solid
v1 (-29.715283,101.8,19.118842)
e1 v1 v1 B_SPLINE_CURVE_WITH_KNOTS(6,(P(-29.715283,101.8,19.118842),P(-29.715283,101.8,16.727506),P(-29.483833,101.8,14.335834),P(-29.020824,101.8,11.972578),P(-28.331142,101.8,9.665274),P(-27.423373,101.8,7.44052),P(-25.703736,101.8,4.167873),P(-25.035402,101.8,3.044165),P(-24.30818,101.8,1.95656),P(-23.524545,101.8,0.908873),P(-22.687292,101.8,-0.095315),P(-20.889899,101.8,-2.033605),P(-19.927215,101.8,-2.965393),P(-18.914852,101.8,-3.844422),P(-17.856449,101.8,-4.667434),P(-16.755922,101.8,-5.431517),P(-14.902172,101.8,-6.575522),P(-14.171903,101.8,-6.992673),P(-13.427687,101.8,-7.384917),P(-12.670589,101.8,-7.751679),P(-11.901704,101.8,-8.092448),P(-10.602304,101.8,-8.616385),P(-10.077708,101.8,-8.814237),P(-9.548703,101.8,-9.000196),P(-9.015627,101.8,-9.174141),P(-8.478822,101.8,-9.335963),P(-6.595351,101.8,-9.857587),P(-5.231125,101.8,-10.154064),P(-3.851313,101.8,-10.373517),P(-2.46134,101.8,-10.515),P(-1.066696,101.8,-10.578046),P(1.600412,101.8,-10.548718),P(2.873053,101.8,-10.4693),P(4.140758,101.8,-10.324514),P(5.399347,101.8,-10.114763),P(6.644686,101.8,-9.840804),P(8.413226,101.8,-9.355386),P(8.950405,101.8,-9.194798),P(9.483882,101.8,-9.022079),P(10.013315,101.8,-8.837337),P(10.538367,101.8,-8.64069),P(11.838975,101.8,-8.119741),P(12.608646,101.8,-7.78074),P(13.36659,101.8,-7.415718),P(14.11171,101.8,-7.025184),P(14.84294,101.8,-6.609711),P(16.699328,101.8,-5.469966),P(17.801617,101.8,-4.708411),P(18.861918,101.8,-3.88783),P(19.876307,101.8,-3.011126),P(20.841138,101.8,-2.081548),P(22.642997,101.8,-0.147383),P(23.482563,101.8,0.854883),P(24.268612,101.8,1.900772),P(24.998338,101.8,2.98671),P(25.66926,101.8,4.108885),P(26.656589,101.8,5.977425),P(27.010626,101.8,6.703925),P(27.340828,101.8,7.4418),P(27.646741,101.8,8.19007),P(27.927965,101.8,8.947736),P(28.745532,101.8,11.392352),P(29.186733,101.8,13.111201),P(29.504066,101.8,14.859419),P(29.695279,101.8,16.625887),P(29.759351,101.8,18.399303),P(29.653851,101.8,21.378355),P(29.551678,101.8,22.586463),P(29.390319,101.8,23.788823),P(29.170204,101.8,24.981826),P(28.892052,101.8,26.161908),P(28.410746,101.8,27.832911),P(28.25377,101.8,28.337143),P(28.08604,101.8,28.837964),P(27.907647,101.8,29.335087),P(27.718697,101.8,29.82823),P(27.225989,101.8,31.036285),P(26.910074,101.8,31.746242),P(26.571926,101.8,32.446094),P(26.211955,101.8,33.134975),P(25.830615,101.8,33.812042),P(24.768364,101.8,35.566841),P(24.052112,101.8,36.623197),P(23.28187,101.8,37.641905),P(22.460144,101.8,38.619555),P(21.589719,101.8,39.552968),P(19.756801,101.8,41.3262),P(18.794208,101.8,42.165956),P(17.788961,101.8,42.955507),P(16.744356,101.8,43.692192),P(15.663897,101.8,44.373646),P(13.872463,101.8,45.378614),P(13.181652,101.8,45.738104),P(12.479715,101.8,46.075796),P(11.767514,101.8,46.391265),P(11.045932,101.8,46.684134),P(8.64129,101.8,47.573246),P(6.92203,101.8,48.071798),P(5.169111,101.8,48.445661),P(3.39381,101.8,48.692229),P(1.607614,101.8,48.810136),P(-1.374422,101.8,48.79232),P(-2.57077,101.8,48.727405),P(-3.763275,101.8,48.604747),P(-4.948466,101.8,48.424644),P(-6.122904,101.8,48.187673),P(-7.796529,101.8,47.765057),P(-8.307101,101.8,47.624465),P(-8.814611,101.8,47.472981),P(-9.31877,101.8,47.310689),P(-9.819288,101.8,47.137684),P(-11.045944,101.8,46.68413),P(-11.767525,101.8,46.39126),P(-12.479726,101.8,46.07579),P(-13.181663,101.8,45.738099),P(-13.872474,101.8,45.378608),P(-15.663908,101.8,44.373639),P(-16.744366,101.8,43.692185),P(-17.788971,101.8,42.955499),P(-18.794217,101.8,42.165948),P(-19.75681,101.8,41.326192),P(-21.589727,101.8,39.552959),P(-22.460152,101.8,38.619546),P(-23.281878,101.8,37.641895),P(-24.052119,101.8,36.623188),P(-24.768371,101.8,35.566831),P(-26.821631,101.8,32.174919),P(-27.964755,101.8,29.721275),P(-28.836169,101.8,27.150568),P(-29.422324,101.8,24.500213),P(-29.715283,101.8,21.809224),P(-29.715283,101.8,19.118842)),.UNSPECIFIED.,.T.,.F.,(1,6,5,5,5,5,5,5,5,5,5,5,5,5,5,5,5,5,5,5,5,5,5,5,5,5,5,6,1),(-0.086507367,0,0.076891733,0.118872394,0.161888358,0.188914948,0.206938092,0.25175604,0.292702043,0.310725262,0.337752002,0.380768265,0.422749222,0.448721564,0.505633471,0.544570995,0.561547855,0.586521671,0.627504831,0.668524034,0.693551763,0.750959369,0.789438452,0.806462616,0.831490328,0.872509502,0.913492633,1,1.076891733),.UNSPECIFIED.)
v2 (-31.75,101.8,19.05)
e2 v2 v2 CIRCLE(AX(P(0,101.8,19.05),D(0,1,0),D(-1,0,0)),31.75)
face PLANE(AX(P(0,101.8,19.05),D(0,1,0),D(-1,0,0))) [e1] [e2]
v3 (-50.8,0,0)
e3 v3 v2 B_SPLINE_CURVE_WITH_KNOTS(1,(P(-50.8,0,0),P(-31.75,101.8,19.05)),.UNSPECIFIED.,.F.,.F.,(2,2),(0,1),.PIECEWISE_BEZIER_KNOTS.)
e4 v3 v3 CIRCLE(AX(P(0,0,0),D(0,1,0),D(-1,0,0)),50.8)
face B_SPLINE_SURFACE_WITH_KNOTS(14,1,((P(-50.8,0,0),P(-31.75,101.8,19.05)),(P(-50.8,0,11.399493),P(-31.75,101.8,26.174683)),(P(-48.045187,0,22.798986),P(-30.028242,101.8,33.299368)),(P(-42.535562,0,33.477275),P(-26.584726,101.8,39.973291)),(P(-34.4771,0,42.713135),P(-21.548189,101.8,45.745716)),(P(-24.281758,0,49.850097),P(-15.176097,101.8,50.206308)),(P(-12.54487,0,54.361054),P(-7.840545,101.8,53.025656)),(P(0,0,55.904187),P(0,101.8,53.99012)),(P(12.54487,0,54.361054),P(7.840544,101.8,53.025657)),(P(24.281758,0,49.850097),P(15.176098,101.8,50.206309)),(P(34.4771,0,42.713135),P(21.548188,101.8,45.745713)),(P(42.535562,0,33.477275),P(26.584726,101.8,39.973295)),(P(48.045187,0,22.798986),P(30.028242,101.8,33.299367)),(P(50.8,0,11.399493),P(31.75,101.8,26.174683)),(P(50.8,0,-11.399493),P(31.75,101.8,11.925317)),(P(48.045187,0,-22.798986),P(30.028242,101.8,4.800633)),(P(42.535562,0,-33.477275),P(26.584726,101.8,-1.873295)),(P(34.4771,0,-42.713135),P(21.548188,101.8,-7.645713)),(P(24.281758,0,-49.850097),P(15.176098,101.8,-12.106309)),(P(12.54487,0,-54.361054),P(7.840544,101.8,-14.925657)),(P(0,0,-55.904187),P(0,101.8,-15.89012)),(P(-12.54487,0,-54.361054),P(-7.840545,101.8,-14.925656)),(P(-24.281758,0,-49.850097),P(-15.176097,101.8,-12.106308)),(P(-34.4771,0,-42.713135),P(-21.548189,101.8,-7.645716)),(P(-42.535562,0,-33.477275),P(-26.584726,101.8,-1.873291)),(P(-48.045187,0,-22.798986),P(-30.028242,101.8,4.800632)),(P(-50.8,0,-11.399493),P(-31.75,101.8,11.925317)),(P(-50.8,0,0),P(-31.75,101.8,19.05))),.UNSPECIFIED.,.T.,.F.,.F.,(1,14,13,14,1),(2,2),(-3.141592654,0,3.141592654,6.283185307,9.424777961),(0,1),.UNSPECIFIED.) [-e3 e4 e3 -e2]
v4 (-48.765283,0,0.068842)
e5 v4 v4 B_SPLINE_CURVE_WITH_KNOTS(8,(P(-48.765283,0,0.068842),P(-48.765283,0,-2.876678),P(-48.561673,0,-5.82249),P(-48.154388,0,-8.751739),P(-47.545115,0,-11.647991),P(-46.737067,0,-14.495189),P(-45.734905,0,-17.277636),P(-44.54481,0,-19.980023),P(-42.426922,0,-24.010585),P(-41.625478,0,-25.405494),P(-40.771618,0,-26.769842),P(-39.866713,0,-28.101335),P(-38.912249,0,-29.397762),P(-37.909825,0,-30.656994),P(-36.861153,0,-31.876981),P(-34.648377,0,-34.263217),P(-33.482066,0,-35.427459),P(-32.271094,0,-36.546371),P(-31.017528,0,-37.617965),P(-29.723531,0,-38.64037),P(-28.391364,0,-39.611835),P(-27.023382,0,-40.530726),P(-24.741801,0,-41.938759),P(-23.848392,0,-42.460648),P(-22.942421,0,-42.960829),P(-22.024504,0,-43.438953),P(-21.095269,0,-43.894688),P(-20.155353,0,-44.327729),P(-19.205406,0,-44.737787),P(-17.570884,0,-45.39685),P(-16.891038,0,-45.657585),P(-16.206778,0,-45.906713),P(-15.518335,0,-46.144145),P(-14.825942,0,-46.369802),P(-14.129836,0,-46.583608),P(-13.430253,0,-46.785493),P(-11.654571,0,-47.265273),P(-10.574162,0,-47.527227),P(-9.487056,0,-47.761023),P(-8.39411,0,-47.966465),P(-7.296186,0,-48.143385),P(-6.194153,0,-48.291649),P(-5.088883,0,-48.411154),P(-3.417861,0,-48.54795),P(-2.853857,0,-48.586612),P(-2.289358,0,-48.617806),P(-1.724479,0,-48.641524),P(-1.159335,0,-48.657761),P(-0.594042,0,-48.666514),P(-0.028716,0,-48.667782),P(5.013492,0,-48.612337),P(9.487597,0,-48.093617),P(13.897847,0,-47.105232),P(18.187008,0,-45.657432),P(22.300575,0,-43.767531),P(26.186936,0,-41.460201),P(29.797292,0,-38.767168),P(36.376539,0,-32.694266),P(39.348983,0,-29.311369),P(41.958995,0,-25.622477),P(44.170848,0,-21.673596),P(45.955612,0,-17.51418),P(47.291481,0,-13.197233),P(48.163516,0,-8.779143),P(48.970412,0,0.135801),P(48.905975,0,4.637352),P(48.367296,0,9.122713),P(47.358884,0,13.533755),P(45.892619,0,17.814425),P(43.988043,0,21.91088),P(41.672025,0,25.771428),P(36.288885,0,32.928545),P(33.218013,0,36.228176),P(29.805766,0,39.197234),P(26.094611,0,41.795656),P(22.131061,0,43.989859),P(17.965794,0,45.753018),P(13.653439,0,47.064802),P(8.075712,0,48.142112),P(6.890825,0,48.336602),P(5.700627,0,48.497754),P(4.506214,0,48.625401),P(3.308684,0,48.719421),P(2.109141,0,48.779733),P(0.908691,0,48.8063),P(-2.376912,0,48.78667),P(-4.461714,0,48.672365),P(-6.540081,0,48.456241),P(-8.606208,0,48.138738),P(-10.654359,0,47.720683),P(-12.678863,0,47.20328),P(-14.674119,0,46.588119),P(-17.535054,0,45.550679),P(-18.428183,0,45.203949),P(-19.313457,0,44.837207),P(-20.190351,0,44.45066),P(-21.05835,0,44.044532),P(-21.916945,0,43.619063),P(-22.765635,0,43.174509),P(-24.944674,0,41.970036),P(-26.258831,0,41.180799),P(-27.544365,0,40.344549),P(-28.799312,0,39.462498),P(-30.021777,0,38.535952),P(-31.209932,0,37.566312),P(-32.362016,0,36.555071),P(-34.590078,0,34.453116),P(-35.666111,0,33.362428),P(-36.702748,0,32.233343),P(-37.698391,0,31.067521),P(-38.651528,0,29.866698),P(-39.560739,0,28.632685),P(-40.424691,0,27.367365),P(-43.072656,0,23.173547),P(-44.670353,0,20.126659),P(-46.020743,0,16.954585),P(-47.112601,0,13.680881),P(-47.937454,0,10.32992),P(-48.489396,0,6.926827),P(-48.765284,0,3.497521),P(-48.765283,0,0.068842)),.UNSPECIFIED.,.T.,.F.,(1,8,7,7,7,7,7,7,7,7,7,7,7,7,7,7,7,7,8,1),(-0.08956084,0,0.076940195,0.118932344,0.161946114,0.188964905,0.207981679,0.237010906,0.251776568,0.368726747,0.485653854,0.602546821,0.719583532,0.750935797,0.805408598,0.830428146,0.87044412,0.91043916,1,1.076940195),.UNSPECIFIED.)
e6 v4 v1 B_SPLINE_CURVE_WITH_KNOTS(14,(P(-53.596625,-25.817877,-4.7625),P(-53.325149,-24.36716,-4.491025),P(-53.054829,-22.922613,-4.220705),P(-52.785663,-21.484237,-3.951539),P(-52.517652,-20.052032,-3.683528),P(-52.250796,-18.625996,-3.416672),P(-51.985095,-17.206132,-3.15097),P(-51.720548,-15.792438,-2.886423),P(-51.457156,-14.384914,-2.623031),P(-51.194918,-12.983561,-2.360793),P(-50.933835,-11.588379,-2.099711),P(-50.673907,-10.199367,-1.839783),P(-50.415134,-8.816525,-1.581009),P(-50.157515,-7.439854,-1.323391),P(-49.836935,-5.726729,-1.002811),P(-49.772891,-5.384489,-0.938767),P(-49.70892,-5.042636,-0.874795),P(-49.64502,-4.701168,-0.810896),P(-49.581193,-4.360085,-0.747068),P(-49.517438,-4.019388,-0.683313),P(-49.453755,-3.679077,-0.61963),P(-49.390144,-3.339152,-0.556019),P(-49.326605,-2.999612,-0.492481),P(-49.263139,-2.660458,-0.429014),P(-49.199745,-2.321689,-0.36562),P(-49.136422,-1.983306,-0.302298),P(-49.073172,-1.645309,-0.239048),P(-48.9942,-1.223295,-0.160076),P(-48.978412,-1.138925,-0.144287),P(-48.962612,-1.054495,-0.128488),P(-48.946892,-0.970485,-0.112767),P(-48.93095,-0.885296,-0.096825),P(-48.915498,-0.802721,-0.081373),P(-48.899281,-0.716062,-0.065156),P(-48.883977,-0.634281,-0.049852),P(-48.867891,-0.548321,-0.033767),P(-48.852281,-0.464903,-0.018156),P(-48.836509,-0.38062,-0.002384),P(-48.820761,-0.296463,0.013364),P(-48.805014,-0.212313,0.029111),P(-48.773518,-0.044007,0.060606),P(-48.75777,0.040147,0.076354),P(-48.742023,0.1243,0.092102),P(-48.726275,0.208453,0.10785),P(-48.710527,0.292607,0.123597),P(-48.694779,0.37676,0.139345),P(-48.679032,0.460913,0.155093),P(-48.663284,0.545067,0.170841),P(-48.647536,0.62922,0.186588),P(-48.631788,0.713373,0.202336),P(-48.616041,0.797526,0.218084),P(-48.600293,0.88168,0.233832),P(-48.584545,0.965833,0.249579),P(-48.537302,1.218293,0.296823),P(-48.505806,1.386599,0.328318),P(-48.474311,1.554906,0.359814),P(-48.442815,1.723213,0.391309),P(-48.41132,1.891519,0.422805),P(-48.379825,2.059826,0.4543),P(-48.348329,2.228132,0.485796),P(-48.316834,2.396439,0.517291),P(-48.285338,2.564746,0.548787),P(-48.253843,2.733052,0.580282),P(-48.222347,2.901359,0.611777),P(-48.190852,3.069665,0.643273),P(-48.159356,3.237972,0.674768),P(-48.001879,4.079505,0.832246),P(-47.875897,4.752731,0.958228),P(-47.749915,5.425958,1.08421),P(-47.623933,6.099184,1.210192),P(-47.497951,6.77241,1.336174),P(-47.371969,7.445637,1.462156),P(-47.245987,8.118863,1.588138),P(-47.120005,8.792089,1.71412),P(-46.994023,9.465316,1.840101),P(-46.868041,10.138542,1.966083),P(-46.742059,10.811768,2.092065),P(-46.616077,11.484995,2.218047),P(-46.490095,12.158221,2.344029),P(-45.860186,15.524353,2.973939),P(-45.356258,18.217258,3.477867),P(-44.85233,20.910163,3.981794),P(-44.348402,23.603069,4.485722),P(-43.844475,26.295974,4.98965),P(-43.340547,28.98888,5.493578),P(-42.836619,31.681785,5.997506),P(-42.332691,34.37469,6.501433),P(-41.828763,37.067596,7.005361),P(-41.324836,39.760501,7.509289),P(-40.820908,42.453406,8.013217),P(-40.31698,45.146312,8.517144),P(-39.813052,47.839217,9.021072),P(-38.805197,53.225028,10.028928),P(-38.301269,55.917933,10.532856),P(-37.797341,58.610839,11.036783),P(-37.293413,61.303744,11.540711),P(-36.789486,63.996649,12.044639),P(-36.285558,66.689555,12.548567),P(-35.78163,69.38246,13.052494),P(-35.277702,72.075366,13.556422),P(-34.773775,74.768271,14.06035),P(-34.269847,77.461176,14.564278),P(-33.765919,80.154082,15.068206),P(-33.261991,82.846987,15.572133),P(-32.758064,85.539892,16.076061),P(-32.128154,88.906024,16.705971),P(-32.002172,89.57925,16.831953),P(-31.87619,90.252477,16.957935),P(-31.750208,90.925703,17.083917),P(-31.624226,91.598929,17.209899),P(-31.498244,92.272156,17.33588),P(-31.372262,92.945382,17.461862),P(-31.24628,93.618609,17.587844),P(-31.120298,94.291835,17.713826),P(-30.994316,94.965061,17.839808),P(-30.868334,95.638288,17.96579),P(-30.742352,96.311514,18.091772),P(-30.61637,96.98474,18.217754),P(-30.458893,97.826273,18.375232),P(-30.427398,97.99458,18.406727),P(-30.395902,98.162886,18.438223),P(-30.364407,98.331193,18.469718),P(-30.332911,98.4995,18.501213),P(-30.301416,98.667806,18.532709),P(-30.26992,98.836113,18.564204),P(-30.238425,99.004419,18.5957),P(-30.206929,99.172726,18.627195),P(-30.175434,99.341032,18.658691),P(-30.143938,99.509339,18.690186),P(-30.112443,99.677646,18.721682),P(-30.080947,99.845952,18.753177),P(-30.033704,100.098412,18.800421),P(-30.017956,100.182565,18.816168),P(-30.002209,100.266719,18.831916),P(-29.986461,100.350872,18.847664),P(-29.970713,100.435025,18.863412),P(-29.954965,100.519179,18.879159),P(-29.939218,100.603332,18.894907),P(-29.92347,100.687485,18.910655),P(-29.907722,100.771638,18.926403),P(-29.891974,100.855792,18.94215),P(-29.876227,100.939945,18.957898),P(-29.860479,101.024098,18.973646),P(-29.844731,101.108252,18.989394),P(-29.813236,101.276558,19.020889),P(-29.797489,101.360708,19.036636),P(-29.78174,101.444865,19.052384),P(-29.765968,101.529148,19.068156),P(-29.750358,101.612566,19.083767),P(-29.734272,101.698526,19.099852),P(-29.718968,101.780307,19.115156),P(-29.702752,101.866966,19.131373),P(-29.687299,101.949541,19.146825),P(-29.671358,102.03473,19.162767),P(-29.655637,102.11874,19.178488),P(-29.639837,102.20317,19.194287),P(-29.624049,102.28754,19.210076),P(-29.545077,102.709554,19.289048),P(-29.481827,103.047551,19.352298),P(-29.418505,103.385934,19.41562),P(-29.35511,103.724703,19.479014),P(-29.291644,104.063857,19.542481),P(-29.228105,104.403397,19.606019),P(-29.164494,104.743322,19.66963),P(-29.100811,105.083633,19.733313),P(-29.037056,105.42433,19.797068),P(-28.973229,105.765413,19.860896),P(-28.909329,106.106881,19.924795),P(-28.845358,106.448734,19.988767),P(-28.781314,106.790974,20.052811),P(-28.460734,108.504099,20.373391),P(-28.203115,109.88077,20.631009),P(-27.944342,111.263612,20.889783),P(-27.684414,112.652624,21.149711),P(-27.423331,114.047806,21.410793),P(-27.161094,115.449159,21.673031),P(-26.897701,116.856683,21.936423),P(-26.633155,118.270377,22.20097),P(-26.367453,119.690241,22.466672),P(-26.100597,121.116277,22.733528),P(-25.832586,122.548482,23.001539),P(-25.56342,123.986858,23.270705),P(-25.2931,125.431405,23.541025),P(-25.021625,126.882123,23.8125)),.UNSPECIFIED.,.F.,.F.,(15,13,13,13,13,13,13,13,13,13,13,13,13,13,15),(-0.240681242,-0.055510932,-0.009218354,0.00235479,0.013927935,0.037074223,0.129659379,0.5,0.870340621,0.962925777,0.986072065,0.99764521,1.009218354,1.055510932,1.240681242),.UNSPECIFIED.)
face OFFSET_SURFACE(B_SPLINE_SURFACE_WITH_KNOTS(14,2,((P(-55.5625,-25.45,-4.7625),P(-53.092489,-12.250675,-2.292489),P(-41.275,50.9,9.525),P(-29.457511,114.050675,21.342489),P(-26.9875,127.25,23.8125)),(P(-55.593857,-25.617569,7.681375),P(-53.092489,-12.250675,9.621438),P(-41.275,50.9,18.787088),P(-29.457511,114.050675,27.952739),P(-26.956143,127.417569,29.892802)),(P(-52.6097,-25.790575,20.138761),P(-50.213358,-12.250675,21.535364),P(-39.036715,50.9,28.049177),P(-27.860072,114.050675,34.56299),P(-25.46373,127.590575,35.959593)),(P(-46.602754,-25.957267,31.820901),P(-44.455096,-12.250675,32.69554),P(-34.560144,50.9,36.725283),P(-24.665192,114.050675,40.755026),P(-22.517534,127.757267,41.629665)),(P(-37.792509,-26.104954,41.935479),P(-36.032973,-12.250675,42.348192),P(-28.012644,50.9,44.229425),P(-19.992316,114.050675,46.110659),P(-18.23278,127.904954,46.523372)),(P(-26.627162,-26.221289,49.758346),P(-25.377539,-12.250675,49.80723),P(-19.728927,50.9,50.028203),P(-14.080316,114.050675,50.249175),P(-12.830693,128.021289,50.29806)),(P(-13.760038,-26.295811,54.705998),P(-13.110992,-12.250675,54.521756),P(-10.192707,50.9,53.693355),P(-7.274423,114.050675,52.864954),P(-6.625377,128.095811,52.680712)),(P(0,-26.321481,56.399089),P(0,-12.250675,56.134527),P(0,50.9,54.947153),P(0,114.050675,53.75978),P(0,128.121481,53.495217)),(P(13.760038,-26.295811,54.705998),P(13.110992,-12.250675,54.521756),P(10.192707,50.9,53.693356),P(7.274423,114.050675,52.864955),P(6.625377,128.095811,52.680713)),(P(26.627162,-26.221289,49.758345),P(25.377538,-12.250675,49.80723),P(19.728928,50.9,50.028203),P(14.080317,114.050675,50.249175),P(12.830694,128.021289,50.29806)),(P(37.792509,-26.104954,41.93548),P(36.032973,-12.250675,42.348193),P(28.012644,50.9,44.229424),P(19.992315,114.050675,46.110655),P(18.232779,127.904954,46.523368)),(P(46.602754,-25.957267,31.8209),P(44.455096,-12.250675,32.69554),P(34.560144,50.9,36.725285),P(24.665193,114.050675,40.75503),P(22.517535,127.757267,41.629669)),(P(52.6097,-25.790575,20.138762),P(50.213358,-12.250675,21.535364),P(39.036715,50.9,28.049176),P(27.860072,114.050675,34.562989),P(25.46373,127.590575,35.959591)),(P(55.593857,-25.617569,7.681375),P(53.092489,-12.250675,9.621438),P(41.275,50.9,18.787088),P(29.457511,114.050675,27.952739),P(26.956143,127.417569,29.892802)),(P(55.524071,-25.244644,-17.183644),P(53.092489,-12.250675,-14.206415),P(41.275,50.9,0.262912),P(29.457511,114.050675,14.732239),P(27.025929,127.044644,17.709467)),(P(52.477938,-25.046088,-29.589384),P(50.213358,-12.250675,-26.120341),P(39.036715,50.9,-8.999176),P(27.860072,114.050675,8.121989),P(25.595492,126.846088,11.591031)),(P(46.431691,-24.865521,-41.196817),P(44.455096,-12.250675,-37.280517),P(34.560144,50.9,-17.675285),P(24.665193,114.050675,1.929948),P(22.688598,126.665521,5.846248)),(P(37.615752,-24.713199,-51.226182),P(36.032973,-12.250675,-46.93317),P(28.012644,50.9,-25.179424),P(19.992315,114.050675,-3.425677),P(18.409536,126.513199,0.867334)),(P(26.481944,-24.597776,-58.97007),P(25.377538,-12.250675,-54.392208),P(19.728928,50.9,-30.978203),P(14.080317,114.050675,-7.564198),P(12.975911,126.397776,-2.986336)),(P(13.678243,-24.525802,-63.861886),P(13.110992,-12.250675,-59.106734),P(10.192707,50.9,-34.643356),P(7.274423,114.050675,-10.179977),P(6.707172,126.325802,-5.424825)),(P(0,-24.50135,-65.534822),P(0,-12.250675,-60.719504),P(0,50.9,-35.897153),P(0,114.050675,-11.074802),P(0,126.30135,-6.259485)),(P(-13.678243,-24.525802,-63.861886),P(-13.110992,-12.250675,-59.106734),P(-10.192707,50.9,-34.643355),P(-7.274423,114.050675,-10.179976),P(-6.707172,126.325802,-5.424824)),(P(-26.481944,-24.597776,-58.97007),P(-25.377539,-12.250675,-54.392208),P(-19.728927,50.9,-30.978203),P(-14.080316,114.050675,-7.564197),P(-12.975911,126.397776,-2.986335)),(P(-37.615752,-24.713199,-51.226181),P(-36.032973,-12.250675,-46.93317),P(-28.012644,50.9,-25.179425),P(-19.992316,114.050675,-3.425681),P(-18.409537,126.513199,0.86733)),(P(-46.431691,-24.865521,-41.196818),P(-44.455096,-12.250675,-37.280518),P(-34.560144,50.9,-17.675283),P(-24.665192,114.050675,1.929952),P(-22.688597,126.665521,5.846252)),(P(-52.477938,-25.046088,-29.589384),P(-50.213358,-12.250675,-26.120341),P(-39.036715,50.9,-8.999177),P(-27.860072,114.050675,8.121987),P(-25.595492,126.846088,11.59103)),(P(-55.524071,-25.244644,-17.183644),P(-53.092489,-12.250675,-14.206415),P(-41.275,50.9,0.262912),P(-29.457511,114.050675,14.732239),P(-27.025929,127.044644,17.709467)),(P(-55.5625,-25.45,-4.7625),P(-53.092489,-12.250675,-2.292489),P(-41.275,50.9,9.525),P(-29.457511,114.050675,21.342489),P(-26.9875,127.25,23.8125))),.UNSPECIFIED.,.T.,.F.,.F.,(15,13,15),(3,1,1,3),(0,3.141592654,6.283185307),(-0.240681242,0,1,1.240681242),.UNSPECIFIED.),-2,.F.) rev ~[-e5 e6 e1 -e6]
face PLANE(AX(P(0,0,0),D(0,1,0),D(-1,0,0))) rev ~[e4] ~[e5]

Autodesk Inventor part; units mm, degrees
ref_plane "YZ Plane" through (0, 0, 0) normal (1, 0, 0) x (0, 1, 0)
ref_plane "XY Plane" through (0, 0, 0) normal (0, 0, 1) x (1, 0, 0)
sketch "Szkic6" plane through (0, 0, 0) normal (0, 1, 0) x (-1, 0, 0)
  circle A0 centre (0, 0) radius 50.8
  dimension "d33" = 101.6
ref_plane "Płaszczyzna konstrukcyjna1" through (0, 101.8, 0) normal (0, 1, 0) x (-1, 0, 0)
sketch "Szkic7" plane through (0, 101.8, 0) normal (0, 1, 0) x (-1, 0, 0)
  circle A0 centre (0, 19.05) radius 31.75
  line L0 (0, -20.3) -> (0, 20.3) construction
  circle A1 centre (0, 0) radius 50.8 construction
  dimension "d35" = 63.5
loft "Wyciągnięcie złożone1" add profiles "Szkic6", "Szkic7"
shell "Skorupa1" thickness 2 removed faces 2 at (14.3997, 101.8, 24.5789) at (7.3018, 0, 11.5135)
equation "\"d33\" = OD1"
equation "\"d35\" = OD2"
equation "\"d52\" = THK"
equation "\"SzerokośćGięciaPodcięcia\" = Grubość"
equation "\"RozmiarPodcięciaNarożnika\" = 4 * Grubość"
equation "\"PromieńPrzejścia\" = PromieńGięcia"
equation "\"Rozmiar_promienia_Jacobiego\" = PromieńGięcia"
equation "\"Wielk_odstępu\" = Grubość"
equation "\"d2\" = PromieńGięcia"
equation "\"d23\" = PromieńGięcia"
equation "\"OD1\" = 101.6"
equation "\"OD2\" = 63.5"
equation "\"L\" = 101.8"
equation "\"THK\" = 2"
equation "\"d34\" = L"
equation "\"Grubość\" = 1.5"
equation "\"PromieńGięcia\" = 3"
properties part number "Redukcja asymetryczna Ø101,6x63,5x2 L=101,8" material "304"
